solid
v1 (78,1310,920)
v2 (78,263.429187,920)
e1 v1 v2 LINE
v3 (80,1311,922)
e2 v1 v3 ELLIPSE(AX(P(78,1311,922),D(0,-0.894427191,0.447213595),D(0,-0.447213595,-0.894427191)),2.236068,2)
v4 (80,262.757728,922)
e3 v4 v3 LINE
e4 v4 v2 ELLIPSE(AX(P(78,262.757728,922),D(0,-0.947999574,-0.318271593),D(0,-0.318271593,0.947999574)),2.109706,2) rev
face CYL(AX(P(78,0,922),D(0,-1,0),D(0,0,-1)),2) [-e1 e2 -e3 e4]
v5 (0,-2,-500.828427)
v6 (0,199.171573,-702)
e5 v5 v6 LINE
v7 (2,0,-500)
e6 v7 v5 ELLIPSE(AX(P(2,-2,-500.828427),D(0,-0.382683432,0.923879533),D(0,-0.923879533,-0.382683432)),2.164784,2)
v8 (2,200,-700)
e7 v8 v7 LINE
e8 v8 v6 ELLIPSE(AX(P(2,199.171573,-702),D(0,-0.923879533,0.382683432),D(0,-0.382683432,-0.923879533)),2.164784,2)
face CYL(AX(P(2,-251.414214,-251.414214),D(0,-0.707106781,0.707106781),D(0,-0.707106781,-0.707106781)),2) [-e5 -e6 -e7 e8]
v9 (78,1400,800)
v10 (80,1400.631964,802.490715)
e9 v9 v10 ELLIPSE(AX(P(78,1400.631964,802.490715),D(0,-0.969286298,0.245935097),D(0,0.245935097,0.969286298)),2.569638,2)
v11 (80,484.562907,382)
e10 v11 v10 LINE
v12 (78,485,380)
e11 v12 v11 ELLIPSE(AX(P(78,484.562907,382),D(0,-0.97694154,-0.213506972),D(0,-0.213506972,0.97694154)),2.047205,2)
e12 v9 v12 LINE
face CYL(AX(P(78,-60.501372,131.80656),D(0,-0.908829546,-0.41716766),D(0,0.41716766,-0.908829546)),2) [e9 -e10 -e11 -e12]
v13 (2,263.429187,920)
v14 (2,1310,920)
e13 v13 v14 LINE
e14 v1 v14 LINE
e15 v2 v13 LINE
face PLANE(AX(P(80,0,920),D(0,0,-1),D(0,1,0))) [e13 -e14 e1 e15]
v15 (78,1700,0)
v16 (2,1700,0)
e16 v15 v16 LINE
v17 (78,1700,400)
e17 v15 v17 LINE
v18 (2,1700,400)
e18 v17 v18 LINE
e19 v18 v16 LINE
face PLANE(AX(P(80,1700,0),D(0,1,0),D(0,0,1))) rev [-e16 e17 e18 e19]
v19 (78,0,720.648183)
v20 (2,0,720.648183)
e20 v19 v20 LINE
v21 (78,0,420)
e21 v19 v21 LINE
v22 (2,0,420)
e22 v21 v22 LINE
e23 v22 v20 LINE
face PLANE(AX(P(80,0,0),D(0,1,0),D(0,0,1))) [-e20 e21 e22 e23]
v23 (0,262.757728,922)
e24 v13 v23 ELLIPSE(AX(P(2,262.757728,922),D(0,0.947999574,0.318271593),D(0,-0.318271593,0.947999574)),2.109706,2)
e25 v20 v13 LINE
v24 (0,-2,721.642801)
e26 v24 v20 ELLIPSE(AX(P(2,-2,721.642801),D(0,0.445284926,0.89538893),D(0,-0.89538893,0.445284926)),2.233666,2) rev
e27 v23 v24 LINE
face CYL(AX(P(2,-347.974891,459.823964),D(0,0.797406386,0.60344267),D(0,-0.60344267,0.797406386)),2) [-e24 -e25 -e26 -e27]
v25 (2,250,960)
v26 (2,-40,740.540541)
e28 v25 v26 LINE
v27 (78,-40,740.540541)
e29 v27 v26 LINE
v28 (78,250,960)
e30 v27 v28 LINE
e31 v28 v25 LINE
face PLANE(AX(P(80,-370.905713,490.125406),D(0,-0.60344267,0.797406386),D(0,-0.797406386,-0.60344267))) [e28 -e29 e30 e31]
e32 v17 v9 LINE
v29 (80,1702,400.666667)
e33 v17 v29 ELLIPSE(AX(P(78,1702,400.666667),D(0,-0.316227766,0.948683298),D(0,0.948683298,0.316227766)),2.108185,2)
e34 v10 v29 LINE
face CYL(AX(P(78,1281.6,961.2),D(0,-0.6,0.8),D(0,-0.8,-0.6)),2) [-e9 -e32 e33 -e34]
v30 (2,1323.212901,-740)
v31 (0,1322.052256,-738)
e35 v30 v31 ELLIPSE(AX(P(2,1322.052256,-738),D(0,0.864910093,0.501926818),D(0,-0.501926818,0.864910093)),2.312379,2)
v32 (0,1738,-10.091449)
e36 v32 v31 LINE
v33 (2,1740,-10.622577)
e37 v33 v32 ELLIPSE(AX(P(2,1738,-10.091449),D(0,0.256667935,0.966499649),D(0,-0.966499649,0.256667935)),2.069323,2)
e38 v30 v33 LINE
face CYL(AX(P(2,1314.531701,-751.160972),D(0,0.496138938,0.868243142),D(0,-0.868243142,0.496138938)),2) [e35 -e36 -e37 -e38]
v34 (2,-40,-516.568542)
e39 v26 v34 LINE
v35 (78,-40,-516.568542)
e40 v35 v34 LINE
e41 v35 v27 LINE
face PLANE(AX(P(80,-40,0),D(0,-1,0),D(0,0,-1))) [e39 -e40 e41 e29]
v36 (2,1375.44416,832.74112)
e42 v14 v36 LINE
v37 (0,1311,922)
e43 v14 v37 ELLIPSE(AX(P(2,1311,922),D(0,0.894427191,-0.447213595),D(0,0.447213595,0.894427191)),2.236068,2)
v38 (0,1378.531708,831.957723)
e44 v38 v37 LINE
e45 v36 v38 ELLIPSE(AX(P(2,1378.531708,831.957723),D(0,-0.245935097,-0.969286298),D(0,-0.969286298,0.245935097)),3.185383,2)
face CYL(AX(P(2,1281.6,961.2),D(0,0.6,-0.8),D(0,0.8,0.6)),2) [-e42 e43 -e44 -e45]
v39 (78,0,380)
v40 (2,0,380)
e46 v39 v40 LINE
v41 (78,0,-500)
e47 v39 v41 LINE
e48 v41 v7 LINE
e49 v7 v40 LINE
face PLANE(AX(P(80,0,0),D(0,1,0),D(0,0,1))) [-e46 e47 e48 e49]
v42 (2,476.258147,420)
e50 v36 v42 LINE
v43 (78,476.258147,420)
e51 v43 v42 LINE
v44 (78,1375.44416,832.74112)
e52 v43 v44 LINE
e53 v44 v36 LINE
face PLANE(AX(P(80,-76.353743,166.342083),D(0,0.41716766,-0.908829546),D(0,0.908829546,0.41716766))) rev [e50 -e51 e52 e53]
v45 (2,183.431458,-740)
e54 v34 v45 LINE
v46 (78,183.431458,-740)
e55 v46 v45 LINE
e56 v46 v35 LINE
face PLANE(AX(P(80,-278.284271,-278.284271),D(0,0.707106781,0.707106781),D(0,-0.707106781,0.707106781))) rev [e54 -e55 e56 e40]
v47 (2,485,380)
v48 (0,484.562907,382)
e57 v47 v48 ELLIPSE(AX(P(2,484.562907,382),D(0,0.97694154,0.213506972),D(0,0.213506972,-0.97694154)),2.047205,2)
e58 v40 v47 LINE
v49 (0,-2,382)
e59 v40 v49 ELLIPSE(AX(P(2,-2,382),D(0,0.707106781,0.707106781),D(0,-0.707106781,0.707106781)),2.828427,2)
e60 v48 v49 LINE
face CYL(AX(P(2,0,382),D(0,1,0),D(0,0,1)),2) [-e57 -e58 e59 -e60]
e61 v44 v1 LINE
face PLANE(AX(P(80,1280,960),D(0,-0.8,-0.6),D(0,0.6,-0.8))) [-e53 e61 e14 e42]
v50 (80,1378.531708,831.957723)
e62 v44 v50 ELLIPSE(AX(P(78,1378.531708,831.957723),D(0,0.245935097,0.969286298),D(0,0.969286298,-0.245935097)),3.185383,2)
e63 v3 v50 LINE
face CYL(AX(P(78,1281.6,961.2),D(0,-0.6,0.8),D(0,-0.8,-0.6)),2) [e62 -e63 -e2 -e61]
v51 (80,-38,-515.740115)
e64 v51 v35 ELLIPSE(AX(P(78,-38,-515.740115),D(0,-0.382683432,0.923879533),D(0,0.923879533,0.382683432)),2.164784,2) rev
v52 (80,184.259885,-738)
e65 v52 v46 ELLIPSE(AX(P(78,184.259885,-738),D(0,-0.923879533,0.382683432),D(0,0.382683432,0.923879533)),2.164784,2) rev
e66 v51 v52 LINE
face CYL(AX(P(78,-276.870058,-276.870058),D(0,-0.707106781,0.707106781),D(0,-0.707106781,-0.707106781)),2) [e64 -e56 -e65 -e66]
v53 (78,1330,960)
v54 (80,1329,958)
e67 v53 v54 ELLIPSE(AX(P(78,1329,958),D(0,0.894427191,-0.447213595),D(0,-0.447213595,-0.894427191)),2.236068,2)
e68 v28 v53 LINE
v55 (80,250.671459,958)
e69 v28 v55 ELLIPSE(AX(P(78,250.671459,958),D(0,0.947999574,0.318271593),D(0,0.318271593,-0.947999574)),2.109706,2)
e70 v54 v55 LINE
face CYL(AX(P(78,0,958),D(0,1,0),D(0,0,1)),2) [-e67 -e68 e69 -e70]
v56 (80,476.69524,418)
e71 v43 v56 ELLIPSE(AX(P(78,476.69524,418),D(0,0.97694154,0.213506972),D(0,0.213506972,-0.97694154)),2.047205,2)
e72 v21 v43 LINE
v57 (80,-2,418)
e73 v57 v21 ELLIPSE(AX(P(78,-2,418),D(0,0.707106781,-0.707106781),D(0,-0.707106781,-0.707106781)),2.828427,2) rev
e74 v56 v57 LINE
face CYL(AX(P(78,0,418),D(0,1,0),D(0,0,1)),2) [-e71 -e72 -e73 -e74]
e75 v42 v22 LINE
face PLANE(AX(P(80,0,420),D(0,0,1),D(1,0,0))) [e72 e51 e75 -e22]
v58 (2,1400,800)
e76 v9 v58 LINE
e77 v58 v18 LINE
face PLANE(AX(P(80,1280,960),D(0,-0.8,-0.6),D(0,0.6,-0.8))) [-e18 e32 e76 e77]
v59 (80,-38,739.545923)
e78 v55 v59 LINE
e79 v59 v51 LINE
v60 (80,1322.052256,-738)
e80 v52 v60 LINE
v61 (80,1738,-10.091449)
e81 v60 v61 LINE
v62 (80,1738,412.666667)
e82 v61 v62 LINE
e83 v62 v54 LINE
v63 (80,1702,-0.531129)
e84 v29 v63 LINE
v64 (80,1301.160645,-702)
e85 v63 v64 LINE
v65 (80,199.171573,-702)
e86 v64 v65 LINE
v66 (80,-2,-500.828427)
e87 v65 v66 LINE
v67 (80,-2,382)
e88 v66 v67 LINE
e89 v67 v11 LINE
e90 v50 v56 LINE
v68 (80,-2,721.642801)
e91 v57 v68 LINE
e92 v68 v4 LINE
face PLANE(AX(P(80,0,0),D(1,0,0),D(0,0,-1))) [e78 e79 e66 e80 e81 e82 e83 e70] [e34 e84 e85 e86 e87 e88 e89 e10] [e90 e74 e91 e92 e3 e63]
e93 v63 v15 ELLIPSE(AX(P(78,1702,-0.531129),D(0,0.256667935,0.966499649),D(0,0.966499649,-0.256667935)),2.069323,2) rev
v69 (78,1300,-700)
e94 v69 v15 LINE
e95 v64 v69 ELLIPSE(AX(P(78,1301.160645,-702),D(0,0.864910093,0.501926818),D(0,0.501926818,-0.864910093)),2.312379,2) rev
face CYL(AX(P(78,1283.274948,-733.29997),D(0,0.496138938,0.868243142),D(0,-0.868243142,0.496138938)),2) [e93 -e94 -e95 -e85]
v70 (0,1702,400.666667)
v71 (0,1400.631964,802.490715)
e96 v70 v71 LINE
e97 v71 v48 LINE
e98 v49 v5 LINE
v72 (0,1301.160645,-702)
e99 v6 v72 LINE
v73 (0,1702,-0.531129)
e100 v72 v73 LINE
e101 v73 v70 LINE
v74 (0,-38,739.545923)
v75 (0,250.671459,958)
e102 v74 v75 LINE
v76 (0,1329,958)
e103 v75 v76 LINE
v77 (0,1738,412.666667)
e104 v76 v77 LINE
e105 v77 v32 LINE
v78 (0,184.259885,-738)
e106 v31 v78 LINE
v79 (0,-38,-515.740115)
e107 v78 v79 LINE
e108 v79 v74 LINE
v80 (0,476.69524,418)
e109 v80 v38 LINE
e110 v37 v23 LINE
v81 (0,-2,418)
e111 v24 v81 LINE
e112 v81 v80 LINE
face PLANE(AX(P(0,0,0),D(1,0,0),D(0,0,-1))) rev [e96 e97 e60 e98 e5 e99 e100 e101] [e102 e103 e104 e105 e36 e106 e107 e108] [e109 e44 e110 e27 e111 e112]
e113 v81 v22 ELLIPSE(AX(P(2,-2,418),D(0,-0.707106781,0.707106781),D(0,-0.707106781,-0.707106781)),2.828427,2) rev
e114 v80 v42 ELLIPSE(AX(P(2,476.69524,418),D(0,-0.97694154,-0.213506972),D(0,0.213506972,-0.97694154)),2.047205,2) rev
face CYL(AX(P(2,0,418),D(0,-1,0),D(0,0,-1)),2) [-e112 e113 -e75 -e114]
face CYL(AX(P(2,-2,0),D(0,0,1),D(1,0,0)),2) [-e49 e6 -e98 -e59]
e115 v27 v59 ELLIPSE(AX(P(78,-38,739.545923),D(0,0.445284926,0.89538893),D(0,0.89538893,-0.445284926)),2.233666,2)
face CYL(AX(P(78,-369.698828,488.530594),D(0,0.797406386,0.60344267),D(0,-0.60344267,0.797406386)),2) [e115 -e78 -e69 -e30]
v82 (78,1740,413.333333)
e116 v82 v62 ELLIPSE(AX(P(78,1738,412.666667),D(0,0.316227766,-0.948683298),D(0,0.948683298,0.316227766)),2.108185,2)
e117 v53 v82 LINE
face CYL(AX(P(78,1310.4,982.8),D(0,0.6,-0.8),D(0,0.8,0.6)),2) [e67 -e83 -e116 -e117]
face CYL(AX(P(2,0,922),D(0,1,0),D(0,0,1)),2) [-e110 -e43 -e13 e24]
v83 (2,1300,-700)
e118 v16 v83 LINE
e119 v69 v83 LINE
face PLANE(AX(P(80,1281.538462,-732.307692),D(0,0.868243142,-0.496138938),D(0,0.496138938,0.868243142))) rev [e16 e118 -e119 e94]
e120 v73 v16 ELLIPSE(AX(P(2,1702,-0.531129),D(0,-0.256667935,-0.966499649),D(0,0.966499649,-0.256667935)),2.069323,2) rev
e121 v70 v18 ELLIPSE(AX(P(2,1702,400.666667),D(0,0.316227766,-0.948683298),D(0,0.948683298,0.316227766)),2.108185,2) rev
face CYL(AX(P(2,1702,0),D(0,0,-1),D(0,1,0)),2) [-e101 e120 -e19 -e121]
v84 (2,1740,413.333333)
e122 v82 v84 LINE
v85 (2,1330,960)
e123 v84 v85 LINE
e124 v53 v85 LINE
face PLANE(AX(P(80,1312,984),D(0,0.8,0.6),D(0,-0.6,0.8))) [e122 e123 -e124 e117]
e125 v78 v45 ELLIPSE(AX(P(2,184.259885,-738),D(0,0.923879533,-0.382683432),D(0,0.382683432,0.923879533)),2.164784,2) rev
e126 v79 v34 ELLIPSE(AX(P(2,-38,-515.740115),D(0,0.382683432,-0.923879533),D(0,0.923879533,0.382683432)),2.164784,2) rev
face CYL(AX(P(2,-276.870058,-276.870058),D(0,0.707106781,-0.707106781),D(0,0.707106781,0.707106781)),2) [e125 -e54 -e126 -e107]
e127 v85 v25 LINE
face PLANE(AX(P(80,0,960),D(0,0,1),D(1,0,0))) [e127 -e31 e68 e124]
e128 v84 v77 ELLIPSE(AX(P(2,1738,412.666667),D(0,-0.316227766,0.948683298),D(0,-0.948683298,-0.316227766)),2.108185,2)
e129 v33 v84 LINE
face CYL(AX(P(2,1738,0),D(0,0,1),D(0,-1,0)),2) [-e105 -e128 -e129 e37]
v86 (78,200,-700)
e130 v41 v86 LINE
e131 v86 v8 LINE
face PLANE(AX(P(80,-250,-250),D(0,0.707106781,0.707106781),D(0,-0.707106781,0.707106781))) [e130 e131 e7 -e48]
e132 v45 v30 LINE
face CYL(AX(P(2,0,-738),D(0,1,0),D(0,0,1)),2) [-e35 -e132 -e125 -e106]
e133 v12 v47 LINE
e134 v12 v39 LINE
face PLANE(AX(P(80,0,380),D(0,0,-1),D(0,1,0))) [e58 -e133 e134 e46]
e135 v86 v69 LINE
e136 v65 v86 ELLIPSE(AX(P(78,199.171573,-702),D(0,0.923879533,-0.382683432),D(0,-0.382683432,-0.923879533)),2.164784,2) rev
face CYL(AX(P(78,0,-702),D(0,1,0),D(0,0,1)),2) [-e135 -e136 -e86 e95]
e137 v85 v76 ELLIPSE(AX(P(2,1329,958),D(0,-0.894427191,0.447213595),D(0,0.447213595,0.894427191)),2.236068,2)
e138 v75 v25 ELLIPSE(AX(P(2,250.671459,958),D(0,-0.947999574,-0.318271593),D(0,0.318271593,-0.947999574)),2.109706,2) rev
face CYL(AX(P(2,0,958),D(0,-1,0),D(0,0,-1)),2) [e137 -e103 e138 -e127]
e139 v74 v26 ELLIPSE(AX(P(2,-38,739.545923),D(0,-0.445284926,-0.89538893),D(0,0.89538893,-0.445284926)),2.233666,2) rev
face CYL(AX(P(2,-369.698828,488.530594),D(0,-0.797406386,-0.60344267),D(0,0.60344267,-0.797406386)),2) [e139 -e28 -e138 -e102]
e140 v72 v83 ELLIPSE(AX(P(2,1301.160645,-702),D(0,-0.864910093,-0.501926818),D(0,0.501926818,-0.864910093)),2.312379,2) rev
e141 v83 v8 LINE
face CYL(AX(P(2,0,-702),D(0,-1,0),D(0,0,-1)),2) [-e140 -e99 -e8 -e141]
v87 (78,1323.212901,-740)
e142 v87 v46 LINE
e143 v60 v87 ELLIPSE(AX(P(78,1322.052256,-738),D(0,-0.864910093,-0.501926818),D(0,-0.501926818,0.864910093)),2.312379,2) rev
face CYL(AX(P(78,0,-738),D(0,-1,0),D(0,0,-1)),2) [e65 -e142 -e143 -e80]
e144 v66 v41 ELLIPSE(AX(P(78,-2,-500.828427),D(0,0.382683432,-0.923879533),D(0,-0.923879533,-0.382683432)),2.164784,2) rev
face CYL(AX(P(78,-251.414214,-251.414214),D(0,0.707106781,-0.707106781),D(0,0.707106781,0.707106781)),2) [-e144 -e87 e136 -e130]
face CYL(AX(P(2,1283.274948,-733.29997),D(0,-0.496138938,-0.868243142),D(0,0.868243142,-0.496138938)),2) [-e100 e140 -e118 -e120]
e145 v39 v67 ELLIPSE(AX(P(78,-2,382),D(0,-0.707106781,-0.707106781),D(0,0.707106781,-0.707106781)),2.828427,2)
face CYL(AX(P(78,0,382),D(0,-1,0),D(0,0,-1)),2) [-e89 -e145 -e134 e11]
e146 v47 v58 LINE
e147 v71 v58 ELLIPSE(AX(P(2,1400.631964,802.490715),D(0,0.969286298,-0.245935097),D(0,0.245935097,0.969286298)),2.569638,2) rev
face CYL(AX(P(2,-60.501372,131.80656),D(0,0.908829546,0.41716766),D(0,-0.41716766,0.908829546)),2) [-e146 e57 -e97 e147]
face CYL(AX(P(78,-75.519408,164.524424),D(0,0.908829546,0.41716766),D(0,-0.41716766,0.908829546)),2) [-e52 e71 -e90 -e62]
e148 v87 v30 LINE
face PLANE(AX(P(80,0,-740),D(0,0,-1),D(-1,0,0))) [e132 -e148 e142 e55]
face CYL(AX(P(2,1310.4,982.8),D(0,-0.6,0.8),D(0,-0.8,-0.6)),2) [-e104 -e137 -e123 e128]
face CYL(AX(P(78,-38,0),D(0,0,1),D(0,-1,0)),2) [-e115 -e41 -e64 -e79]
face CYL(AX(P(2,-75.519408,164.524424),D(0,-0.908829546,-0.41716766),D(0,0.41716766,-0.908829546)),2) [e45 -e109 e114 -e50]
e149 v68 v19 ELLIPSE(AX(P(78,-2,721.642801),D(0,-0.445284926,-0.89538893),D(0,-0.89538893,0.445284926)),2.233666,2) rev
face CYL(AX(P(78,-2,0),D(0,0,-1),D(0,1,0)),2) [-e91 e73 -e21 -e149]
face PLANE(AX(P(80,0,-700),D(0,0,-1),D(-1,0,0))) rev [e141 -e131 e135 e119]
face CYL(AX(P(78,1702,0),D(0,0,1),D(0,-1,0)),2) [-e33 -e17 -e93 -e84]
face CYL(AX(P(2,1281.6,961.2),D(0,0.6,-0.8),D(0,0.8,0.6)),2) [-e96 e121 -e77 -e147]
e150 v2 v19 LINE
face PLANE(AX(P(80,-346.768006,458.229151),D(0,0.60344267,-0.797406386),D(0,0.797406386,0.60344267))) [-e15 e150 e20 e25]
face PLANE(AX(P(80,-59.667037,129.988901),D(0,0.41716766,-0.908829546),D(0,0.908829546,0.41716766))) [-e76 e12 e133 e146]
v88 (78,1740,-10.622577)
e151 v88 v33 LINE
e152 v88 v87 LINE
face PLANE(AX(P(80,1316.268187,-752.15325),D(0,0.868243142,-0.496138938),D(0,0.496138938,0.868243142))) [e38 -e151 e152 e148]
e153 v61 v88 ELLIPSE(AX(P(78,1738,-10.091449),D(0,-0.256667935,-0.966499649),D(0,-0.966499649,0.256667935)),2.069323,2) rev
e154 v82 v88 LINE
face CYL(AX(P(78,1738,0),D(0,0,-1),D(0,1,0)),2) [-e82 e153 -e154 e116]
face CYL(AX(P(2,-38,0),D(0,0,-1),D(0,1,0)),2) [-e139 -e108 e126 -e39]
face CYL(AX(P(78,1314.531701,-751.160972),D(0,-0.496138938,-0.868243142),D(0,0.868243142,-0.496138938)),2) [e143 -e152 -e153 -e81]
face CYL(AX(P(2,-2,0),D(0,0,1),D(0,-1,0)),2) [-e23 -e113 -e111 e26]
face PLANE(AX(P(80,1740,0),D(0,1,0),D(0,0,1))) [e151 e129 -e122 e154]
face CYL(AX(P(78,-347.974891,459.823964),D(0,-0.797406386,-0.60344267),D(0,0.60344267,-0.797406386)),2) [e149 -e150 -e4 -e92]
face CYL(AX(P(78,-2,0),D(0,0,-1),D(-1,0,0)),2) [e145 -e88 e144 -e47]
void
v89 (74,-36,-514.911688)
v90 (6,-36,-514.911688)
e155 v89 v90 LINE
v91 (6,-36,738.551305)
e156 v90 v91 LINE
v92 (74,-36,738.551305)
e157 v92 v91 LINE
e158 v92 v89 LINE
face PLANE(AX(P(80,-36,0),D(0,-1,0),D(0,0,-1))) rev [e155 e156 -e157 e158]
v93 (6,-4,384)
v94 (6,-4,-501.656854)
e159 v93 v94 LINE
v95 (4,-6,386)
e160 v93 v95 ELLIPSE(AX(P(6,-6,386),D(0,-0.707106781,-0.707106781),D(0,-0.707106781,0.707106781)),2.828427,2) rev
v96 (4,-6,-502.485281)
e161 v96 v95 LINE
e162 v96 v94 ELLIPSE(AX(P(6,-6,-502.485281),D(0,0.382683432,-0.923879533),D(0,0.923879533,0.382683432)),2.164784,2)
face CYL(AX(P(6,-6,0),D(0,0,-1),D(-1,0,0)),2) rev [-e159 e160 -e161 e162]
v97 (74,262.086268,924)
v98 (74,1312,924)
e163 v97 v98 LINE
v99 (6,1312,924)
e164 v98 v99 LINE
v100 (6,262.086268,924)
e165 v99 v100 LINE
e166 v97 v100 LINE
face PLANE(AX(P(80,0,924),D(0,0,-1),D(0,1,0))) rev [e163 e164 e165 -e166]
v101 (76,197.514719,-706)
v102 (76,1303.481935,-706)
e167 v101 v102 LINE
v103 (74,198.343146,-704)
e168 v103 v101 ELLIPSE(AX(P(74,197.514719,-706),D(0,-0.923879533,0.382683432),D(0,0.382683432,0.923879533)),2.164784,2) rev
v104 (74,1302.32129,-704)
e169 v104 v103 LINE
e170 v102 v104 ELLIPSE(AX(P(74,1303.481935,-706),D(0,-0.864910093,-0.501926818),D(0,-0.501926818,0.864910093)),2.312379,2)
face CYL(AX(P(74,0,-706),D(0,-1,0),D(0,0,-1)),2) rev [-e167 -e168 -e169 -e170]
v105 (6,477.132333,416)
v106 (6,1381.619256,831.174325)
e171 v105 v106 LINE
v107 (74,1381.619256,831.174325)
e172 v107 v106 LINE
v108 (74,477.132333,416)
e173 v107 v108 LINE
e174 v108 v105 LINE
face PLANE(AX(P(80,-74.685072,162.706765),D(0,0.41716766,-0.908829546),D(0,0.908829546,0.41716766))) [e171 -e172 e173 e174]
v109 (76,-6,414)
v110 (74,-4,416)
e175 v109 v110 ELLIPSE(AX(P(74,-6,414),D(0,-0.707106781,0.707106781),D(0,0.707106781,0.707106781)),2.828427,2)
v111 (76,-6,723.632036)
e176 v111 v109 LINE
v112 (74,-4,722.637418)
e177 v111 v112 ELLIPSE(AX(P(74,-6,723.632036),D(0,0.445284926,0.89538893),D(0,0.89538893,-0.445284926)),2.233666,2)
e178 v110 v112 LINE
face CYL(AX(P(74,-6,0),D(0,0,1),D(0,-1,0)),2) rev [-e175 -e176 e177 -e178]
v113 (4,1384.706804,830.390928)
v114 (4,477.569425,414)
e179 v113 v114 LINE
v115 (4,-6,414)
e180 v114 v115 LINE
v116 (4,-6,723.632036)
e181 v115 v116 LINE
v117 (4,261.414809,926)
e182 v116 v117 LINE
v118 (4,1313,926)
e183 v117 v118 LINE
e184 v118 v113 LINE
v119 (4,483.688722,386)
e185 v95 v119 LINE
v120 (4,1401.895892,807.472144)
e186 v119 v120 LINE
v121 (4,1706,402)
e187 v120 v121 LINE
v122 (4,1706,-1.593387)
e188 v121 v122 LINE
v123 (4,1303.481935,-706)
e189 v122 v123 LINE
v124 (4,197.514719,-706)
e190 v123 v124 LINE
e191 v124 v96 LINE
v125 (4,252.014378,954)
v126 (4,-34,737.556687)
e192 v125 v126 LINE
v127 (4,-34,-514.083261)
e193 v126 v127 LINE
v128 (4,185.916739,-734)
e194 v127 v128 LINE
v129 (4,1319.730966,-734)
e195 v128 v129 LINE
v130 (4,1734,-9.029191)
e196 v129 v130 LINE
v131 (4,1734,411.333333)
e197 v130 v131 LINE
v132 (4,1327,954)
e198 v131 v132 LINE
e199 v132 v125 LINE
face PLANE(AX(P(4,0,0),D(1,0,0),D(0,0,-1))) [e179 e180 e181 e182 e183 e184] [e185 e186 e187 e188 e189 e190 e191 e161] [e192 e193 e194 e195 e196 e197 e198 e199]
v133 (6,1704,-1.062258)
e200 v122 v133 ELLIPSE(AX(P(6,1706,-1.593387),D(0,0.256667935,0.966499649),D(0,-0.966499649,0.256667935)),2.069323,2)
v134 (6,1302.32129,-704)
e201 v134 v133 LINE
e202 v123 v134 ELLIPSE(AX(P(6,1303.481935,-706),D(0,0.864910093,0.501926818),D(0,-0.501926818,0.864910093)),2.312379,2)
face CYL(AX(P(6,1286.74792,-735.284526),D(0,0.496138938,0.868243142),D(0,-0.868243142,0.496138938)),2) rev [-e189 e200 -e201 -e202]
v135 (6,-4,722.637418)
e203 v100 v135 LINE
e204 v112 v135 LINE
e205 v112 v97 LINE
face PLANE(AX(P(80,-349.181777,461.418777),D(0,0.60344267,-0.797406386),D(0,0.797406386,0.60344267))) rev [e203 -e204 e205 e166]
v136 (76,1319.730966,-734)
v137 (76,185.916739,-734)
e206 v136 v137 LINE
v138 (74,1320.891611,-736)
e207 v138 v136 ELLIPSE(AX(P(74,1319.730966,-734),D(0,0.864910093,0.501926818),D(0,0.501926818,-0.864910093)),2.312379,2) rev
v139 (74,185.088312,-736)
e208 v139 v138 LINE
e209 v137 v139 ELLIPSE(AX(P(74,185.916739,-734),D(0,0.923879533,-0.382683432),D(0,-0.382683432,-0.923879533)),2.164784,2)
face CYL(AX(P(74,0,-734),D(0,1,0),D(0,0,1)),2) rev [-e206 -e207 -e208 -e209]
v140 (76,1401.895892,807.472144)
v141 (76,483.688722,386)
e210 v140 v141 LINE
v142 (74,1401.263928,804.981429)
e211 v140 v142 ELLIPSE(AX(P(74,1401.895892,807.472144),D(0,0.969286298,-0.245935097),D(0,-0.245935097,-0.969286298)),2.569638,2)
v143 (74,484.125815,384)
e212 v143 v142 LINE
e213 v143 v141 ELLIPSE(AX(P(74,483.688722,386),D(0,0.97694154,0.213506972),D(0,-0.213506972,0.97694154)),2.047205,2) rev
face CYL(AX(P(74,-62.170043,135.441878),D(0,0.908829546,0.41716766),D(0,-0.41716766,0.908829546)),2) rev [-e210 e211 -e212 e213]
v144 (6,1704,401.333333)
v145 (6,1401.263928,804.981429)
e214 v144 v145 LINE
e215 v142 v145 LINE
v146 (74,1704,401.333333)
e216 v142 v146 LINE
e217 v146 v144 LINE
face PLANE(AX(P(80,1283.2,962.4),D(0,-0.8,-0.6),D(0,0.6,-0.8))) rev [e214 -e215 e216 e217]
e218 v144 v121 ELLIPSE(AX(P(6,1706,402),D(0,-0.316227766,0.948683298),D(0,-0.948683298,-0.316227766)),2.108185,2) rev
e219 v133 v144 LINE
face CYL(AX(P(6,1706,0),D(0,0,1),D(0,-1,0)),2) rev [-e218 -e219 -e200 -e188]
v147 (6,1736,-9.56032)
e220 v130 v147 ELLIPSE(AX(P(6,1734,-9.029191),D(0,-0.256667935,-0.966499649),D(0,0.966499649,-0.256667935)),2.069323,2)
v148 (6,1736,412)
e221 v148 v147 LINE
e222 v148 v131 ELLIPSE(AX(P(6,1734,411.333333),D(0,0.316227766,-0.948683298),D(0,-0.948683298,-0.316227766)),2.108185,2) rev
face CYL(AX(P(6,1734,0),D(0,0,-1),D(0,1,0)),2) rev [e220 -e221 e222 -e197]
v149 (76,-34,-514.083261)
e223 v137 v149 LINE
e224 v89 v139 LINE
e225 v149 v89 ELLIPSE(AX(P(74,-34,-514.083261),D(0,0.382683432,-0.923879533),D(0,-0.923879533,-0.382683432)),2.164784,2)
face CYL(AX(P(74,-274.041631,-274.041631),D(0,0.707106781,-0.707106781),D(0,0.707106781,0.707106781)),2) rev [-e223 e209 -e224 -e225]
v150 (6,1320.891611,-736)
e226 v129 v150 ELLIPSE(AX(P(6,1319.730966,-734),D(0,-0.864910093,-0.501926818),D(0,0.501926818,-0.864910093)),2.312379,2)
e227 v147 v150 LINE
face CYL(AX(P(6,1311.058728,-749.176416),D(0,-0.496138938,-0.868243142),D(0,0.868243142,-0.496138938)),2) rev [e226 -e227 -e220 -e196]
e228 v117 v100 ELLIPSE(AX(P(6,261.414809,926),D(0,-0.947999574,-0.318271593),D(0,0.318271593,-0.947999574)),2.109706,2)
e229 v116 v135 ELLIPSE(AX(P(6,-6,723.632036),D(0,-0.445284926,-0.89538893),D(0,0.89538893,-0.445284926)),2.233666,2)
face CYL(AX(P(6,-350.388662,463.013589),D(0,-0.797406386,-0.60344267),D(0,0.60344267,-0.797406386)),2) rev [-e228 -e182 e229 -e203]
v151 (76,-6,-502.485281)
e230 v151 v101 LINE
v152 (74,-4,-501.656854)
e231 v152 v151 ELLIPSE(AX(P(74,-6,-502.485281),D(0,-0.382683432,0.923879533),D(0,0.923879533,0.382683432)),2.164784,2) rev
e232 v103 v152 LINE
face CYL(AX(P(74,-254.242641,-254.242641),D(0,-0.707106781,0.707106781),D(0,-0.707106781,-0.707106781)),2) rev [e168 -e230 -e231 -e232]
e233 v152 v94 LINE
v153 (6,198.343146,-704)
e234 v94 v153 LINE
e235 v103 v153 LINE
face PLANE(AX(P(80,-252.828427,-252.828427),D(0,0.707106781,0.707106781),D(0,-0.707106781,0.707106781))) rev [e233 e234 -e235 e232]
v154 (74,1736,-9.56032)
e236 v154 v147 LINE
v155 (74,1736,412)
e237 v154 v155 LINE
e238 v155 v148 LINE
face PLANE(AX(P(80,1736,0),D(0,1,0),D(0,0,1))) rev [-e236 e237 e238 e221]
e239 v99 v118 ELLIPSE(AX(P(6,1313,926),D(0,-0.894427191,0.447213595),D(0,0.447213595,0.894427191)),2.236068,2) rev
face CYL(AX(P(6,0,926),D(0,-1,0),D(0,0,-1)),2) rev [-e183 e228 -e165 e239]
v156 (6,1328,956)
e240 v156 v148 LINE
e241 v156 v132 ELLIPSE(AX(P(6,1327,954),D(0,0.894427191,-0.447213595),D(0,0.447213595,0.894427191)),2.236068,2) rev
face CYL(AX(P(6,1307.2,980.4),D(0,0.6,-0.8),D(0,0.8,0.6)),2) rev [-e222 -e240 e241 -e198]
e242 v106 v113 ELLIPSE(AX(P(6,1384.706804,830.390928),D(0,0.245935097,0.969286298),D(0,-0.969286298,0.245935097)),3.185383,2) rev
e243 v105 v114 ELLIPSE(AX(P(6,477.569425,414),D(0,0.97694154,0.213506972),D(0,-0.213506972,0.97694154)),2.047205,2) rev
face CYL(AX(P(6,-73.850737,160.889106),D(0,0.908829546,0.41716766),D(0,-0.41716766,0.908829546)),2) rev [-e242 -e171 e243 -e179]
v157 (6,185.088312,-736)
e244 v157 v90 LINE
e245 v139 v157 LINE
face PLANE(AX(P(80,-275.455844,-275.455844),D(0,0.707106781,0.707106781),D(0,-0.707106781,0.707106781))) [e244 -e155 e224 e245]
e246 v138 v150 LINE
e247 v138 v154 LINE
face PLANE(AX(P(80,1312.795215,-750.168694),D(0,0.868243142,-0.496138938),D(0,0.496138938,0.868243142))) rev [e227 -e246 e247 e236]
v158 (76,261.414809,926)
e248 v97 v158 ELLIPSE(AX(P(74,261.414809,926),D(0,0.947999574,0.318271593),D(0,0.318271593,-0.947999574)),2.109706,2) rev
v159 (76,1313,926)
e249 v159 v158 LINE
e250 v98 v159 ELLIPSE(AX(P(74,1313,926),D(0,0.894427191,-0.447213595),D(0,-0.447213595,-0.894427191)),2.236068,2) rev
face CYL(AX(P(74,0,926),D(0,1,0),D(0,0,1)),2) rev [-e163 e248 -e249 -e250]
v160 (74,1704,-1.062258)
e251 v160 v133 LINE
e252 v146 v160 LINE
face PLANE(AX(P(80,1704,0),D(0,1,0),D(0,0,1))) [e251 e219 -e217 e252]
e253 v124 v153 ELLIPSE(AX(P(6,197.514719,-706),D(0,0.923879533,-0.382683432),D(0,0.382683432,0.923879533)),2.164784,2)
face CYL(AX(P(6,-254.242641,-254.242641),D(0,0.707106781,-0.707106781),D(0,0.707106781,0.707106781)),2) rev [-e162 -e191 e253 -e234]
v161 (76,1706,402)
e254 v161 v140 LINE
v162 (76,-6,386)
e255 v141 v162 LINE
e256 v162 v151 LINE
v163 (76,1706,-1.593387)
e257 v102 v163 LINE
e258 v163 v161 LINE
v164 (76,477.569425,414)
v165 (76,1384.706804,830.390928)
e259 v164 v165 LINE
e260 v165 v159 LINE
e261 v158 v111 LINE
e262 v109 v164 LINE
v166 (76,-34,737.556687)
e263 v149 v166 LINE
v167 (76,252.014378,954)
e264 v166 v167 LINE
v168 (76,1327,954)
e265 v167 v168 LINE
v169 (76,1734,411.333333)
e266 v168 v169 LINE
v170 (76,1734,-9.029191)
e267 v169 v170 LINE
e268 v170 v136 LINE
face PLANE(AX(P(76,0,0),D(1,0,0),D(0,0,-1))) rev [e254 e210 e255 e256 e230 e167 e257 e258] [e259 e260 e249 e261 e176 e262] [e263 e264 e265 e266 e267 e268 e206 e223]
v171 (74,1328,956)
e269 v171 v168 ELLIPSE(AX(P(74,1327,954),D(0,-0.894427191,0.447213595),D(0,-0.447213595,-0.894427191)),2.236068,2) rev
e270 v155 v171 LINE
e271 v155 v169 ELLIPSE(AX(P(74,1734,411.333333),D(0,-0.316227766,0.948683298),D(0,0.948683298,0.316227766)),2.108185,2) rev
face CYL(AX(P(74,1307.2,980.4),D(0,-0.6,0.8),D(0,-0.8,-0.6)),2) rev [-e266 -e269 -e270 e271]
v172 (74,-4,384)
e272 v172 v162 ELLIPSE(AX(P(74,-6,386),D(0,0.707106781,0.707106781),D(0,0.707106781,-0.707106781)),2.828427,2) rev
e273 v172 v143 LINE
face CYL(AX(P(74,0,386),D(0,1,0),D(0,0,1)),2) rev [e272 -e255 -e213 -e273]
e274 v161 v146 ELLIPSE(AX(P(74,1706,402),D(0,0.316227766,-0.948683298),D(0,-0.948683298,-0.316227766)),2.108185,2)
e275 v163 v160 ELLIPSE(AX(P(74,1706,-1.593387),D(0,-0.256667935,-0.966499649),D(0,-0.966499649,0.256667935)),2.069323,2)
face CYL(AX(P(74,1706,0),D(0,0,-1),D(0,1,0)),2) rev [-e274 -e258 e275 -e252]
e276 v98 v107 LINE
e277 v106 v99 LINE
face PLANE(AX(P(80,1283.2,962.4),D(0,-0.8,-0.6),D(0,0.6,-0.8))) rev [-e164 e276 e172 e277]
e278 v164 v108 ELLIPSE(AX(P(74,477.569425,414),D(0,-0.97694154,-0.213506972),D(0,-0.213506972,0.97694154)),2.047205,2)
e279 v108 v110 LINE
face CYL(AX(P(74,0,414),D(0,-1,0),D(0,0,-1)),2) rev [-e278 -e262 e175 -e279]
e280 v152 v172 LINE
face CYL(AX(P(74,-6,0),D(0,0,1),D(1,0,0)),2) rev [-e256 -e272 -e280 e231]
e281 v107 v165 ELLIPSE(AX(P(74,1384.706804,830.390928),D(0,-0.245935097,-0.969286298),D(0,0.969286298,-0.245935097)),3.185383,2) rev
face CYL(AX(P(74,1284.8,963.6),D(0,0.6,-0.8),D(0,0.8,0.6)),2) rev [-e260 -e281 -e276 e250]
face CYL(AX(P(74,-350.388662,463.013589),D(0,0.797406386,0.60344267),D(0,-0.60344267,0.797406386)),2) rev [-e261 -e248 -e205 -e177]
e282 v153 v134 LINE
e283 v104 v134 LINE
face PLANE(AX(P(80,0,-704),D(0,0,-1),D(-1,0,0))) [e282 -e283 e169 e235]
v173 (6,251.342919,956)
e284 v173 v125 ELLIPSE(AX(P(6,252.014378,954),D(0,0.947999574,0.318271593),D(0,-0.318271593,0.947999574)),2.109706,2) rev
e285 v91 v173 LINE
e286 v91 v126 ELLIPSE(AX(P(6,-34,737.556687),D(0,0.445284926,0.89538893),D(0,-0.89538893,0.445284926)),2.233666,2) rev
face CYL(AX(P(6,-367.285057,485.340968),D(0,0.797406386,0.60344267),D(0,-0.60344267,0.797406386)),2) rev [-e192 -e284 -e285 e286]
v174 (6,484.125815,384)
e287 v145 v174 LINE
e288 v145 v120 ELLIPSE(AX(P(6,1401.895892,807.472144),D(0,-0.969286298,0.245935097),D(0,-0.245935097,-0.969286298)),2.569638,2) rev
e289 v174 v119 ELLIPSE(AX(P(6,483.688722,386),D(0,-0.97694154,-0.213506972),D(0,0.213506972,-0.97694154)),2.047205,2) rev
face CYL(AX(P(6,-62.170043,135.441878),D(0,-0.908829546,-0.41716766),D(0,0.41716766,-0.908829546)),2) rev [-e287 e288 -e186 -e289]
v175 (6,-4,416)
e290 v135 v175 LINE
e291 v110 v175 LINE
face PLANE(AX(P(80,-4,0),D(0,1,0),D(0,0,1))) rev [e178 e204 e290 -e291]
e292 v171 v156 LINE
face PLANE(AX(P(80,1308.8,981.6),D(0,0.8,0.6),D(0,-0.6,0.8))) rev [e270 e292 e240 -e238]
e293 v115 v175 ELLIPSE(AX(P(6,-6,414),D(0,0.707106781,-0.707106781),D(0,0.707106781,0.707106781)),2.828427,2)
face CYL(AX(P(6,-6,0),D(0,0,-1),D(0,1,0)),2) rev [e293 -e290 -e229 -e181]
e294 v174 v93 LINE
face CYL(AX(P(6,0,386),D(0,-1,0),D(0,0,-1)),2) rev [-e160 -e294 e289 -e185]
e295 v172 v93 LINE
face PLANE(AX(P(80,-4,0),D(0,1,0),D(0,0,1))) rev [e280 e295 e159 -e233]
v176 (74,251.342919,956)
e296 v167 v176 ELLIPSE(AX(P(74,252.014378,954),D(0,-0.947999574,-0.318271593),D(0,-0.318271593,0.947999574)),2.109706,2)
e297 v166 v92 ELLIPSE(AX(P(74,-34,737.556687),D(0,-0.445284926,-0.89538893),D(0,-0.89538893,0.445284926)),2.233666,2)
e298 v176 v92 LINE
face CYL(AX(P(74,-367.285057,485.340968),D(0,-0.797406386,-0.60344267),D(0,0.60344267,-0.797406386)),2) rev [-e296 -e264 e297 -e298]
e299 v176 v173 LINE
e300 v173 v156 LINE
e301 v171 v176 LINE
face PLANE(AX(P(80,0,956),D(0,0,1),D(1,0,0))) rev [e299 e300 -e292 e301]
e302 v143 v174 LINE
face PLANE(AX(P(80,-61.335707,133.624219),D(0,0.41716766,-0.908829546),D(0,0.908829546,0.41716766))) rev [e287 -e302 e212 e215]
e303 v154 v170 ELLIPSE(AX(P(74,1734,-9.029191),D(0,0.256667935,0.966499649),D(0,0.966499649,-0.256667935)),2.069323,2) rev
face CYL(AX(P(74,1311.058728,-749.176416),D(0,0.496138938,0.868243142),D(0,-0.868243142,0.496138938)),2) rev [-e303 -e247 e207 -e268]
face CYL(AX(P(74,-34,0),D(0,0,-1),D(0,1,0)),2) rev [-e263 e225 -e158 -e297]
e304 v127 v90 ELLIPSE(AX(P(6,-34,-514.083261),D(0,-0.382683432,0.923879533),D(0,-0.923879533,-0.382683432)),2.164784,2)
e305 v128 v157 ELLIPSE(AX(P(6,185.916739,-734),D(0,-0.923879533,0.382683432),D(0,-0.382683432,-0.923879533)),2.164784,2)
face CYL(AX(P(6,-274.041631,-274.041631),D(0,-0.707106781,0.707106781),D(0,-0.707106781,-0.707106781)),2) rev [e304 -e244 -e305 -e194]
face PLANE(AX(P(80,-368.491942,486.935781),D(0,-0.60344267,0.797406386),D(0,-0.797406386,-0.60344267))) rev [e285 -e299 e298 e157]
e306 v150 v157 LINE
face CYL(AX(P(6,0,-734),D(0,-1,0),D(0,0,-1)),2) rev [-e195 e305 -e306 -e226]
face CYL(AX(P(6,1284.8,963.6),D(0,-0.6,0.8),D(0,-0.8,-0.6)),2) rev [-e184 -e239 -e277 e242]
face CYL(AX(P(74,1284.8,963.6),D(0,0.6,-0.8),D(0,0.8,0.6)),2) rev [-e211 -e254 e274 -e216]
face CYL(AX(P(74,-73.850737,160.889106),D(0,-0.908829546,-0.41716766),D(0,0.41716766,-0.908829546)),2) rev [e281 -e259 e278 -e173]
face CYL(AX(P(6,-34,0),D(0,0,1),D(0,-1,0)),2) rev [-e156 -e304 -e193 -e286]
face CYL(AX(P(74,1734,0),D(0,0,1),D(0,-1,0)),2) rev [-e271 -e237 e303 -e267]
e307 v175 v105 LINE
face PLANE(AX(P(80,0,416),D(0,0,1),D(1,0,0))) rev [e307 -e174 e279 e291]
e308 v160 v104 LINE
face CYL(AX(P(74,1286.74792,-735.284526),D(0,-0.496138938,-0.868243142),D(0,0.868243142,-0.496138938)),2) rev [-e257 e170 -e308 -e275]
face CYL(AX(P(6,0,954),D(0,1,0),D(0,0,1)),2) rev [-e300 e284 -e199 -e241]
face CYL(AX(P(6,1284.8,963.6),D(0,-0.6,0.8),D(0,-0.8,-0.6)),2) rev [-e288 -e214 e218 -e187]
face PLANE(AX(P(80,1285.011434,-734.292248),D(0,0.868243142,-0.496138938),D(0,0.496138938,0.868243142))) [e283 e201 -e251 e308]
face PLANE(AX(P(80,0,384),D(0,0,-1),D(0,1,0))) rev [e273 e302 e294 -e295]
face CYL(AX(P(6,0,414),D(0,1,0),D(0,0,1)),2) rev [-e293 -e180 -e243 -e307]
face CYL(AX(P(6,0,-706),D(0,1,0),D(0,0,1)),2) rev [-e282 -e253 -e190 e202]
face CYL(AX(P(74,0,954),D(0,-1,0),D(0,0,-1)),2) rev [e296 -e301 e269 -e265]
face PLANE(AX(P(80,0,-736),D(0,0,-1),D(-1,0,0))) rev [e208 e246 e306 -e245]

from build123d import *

# Parameters (mm, degrees)
BOSS_EXTRU_1_DEPTH = 80
COQUE1_START       = 4
COQUE1_DEPTH       = 72
CONG_2_R           = 2


# Read off the part's stored shape, not the designer's step: Coque1
with BuildPart() as part:
    # Esquisse1 → Boss.-Extru.1 (new body)
    with BuildSketch(Plane(origin=(0, 0, 0), x_dir=(0, 0, -1), z_dir=(1, 0, 0))):
        Polygon((740, 183.431457505), (740, 1323.212901419), (10.622577483, 1740), (-413.333333333, 1740), (-840, 1420), (-960, 1330), (-960, 250), (-740.540540541, -40), (-419.892357873, -40), (0, -40), (516.568542495, -40), align=None)
        Polygon((-420, 476.25814746), (-420, 26.428571429), (-420, 0), (-450.162628143, 0), (-554.571588527, 0), (-720.648182668, 0), (-920, 263.429187189), (-920, 1310), (-832.74112038, 1375.444159715), (-800, 1304.115290317), align=None, mode=Mode.SUBTRACT)
        Polygon((500, 0), (0, 0), (-380, 0), (-380, 485), (-400, 528.571428571), (-800, 1400), (-400, 1700), (0, 1700), (700, 1300), (700, 200), align=None, mode=Mode.SUBTRACT)
    extrude(amount=BOSS_EXTRU_1_DEPTH)

    # Coque1 outline → Coque1 (cut)
    with BuildSketch(Plane.YZ.offset(COQUE1_START)):
        Polygon((1736, -9.560319735), (1736, 412), (1328, 956), (251.342918719, 956), (-36, 738.551304753), (-36, -514.911688245), (185.088311755, -736), (1320.891611277, -736), align=None)
        Polygon((484.125814746, 384), (1401.263928167, 804.981429111), (1704, 401.333333333), (1704, -1.062257748), (1302.321290142, -704), (198.343145751, -704), (-4, -501.656854249), (-4, 384), align=None, mode=Mode.SUBTRACT)
        Polygon((262.08626847, 924), (1312, 924), (1381.619255939, 831.174325415), (477.132332714, 416), (-4, 416), (-4, 722.637418455), align=None, mode=Mode.SUBTRACT)
    extrude(amount=COQUE1_DEPTH, mode=Mode.SUBTRACT)

    # Congé2
    cong_2_edges = [part.edges().sort_by_distance(p)[0] for p in [
        (80, 942.5, 590),
        (80, 1550, 600),
        (80, 1700, 200),
        (0, 786.714593595, 920),
        (0, 131.714593595, 820.324091334),
        (80, 1500, -350),
        (0, 0, 570.324091334),
        (0, 238.12907373, 420),
        (0, 925.851153588, 626.37056019),
        (0, 1342.722079858, 876.37056019),
        (0, 1740, 201.355377925),
        (0, 1531.606450709, -375.311288741),
        (0, 753.322179462, -740),
        (80, 750, -700),
        (0, 71.715728753, -628.284271247),
        (0, -40, 111.985999023),
        (0, 105, 850.27027027),
        (0, 790, 960),
        (0, 1535, 686.666666667),
        (0, 0, -60),
        (0, 100, -600),
        (80, 100, -600),
        (0, 750, -700),
        (0, 1500, -350),
        (0, 1700, 200),
        (0, 1550, 600),
        (0, 942.5, 590),
        (0, 242.5, 380),
        (80, 0, -60),
        (80, 1535, 686.666666667),
        (80, 790, 960),
        (80, 105, 850.27027027),
        (80, -40, 111.985999023),
        (80, 71.715728753, -628.284271247),
        (80, 753.322179462, -740),
        (80, 1531.606450709, -375.311288741),
        (80, 242.5, 380),
        (76, 1346.80962797, 877.587162708),
        (4, 929.375794326, 623.587162708),
        (76, 236.566166357, 416),
        (76, -4, 569.318709227),
        (80, 1740, 201.355377925),
        (76, 129.043134235, 823.318709227),
        (76, 1532, 684),
        (76, 789.671459359, 956),
        (76, 107.67145936, 847.275652377),
        (76, -36, 111.819808254),
        (4, 74.544155878, -625.455844123),
        (76, 752.989961516, -736),
        (76, 1528.445805639, -372.780159868),
        (76, 240.062907373, 384),
        (76, 942.694871456, 594.490714556),
        (76, 1552.631964083, 603.157381222),
        (4, 1704, 200.135537793),
        (4, 1503.160645071, -352.531128874),
        (4, 750.332217947, -704),
        (76, 97.171572876, -602.828427124),
        (76, 1736, 201.219840132),
        (76, -4, -58.828427125),
        (76, 787.043134235, 924),
        (76, 1704, 200.135537793),
        (76, 1503.160645071, -352.531128874),
        (76, 750.332217947, -704),
        (76, 74.544155878, -625.455844123),
        (80, 1342.722079858, 876.37056019),
        (76, 929.375794326, 623.587162708),
        (4, 240.062907373, 384),
        (4, -4, -58.828427125),
        (4, 97.171572876, -602.828427124),
        (4, 1552.631964083, 603.157381222),
        (4, 942.694871456, 594.490714556),
        (4, 1532, 684),
        (4, 1736, 201.219840132),
        (4, 1528.445805639, -372.780159868),
        (4, 752.989961516, -736),
        (4, -36, 111.819808254),
        (4, 107.67145936, 847.275652377),
        (4, 789.671459359, 956),
        (4, 1346.80962797, 877.587162708),
        (4, 787.043134235, 924),
        (4, 129.043134235, 823.318709227),
        (4, -4, 569.318709227),
        (4, 236.566166357, 416),
        (80, 925.851153588, 626.37056019),
        (80, 238.12907373, 420),
        (80, 0, 570.324091334),
        (80, 131.714593595, 820.324091334),
        (80, 786.714593595, 920),
    ]]
    fillet(cong_2_edges, radius=CONG_2_R)


solid = part.part
